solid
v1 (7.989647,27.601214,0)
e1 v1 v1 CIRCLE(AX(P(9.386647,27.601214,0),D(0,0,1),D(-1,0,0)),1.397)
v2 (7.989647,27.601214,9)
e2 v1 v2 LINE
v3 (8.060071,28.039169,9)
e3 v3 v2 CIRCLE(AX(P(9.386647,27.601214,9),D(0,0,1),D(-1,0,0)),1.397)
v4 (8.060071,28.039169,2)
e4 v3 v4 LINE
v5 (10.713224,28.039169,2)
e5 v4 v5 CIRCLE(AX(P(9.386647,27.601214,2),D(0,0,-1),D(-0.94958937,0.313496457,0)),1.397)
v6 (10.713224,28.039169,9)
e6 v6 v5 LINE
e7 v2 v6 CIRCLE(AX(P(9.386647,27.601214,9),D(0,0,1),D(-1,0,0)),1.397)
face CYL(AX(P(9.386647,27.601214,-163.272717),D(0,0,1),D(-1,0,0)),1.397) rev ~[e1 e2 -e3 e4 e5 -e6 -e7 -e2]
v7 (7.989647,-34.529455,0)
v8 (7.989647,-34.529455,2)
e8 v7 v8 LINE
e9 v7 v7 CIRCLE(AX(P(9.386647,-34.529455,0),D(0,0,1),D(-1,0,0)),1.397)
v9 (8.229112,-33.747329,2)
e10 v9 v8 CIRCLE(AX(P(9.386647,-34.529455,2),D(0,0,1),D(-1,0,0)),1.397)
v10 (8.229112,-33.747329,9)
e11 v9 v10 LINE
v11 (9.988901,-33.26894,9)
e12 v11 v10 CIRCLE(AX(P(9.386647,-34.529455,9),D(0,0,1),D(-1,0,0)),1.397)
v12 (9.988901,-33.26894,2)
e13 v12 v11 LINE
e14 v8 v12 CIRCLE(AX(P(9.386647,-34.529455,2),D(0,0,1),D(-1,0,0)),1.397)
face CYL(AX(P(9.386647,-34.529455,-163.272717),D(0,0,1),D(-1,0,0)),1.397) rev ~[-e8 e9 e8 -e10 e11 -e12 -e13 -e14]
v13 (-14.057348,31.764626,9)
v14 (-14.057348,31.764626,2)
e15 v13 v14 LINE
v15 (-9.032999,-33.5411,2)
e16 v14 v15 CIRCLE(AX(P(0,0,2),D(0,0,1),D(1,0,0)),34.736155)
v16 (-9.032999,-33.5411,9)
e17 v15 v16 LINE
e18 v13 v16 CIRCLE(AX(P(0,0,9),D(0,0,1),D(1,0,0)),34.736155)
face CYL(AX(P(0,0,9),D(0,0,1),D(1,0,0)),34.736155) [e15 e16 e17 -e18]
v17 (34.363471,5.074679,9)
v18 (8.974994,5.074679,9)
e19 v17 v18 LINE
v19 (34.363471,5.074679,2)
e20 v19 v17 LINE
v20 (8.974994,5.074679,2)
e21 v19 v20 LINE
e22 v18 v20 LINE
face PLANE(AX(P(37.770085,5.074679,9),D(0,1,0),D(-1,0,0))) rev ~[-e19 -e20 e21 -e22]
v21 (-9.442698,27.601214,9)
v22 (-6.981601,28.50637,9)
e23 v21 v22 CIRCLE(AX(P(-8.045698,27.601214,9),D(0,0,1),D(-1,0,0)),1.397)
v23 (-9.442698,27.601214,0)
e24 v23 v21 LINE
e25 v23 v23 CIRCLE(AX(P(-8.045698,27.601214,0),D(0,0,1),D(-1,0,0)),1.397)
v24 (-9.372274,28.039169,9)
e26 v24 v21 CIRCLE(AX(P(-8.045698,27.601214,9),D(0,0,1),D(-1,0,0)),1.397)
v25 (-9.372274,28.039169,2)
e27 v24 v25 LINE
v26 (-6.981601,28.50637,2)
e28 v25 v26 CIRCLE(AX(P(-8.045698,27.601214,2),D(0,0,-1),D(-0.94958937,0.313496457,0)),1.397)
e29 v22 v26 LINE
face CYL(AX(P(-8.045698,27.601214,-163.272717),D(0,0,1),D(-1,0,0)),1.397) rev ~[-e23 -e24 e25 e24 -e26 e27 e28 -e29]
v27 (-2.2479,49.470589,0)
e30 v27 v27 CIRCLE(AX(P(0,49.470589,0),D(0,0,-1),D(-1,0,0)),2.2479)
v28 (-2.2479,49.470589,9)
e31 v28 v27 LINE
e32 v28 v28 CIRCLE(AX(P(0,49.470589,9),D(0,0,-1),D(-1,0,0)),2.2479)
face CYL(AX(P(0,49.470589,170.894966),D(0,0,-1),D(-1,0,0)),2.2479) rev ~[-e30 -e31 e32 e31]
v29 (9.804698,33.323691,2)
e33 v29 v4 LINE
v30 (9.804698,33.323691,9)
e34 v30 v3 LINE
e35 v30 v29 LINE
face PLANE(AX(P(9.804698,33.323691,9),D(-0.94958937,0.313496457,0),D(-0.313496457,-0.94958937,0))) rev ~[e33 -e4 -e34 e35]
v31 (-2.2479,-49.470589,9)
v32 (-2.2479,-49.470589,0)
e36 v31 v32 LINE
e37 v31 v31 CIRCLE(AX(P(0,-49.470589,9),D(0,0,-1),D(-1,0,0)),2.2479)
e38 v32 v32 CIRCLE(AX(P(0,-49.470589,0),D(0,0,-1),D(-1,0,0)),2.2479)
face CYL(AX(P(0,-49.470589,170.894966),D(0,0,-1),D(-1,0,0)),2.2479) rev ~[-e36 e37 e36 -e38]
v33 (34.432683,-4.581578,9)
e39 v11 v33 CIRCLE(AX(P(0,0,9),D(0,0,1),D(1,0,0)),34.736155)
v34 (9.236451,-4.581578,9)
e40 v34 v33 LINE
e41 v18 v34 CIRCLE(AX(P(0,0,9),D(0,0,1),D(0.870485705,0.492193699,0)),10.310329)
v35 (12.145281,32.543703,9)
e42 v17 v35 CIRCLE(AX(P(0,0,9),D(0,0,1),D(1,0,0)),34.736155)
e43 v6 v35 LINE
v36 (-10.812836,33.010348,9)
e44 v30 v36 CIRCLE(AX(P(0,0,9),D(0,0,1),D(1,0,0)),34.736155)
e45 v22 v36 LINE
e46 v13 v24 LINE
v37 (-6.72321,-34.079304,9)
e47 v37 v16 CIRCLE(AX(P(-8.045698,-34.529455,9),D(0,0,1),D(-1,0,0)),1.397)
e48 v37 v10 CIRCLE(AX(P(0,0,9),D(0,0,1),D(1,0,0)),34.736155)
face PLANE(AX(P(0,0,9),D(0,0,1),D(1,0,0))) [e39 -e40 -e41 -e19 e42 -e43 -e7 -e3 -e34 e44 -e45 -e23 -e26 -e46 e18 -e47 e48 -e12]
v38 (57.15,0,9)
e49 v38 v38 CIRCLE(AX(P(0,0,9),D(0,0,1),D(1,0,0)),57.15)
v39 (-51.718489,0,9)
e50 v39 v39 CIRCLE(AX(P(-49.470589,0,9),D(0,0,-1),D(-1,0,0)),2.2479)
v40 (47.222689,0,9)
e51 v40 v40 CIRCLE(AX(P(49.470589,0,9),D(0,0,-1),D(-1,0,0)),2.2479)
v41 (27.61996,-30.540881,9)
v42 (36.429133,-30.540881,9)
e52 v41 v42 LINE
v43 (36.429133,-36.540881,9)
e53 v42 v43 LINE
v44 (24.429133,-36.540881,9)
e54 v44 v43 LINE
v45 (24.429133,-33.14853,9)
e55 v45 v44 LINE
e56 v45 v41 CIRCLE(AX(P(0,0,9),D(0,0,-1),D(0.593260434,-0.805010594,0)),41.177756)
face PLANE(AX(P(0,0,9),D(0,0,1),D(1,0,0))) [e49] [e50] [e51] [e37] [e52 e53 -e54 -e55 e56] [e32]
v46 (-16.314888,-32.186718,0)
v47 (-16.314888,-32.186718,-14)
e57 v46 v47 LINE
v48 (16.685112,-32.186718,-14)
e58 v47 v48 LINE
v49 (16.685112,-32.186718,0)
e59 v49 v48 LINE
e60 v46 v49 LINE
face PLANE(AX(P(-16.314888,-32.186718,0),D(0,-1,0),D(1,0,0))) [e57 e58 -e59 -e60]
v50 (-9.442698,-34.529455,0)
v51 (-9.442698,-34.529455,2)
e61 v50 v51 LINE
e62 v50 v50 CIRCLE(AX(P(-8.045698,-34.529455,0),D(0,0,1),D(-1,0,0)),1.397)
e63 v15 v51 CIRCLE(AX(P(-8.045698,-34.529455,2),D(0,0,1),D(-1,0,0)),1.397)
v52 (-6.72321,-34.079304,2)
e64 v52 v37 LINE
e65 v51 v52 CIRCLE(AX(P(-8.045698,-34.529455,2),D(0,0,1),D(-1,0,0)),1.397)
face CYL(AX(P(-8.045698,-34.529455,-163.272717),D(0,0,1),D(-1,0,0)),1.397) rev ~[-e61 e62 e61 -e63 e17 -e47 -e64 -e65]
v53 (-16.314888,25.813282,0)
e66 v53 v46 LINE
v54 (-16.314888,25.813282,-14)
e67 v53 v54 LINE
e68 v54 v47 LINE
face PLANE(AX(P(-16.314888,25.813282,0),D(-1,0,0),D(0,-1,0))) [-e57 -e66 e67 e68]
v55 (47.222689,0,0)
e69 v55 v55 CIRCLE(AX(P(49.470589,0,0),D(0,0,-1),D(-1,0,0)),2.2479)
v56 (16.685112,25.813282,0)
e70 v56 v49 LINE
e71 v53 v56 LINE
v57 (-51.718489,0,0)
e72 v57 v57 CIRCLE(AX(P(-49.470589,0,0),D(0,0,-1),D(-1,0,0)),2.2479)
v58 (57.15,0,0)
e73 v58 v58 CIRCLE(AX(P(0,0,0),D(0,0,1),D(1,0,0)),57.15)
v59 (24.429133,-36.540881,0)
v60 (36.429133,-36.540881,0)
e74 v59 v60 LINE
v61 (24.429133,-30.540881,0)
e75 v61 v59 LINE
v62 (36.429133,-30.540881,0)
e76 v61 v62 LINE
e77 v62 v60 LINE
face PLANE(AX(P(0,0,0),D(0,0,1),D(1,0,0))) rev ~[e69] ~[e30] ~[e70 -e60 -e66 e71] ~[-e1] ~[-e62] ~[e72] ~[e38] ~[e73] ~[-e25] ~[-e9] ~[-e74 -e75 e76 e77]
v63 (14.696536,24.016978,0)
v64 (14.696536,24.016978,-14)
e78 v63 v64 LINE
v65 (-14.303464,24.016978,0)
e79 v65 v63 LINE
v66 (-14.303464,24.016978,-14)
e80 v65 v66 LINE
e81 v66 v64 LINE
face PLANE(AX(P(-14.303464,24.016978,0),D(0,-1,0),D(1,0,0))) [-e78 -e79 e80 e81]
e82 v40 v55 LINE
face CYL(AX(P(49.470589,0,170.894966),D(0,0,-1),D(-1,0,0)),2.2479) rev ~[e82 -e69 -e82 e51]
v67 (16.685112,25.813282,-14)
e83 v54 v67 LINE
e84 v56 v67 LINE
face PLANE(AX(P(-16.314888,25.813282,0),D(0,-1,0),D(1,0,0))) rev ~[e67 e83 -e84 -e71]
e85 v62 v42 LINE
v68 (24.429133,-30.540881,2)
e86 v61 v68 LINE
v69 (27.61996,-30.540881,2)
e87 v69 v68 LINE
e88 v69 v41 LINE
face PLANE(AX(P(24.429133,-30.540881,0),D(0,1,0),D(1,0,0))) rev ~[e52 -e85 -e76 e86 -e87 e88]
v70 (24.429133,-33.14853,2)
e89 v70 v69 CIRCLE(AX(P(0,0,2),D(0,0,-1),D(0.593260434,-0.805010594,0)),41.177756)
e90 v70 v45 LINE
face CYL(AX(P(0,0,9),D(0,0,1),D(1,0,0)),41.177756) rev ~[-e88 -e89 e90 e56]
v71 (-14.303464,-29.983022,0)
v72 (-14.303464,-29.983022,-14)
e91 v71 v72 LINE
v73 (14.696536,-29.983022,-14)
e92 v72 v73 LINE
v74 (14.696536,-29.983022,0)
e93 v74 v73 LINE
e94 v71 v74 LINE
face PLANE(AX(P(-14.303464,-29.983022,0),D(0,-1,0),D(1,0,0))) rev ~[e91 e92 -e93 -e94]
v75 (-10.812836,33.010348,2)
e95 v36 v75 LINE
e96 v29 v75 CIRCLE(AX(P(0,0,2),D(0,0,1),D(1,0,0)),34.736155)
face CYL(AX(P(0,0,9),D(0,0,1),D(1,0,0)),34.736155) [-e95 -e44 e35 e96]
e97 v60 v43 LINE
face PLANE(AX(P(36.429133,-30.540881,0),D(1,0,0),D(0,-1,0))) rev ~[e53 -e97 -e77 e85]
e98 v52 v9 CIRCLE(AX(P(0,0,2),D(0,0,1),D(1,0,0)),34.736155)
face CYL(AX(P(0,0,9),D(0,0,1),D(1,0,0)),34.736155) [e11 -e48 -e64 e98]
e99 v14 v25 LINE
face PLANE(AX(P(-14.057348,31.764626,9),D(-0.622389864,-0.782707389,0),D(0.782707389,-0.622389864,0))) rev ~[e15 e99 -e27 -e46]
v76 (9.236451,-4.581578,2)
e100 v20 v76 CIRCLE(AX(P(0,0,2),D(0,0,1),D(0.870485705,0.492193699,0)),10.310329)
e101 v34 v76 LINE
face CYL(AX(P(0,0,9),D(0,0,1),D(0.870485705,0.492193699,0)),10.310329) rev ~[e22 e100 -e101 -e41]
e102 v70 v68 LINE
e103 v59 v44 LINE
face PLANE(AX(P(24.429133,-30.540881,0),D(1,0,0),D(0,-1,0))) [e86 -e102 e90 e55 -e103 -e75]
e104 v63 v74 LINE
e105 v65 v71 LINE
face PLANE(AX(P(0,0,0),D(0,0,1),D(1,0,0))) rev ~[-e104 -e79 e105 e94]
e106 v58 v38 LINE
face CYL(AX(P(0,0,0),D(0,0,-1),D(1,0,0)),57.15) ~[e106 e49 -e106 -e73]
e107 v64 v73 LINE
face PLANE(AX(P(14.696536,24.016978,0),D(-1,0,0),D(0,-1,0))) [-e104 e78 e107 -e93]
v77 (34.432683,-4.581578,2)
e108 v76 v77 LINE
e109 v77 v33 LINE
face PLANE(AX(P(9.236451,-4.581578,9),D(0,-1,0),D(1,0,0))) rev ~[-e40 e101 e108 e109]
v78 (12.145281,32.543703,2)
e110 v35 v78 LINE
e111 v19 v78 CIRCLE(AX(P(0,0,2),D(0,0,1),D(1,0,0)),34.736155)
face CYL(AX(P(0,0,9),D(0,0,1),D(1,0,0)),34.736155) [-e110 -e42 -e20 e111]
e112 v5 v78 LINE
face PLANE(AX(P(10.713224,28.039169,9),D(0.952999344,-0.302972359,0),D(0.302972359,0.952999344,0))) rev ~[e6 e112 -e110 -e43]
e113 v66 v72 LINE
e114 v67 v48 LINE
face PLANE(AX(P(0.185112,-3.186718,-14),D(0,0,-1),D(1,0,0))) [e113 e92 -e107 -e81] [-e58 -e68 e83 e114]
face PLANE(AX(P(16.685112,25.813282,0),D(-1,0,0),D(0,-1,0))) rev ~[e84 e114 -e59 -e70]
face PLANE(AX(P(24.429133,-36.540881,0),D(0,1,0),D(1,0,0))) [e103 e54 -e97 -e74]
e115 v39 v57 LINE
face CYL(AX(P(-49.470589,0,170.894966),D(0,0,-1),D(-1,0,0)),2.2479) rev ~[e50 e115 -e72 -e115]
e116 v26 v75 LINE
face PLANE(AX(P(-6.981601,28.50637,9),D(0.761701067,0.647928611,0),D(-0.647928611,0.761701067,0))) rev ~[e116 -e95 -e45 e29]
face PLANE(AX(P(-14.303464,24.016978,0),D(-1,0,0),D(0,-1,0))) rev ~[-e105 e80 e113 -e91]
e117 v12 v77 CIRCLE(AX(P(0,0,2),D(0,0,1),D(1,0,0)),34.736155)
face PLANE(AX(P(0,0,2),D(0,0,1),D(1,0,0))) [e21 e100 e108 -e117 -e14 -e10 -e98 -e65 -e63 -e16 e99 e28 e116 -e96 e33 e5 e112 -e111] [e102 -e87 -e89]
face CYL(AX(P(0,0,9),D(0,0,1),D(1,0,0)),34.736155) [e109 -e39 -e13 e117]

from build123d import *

# Parameters (mm, degrees)
F0_R      = 57.15
F1_DEPTH  = 9
F2_R      = 41.1777557501
F2_R_2    = 34.7361553424
F3_DEPTH  = 7
F5_DEPTH  = 7
F6_W      = 12
F6_H      = 6
F7_DEPTH  = 9
F9_D      = 4.4958
F10_W     = 33
F10_H     = 58
F10_W_2   = 29
F10_H_2   = 54
F11_DEPTH = 14
F13_D     = 2.794
F15_DEPTH = 7


with BuildPart() as f1:
    # F0 (on Top) → F1 (new body)
    with BuildSketch(Plane.XY):
        Circle(F0_R)
    extrude(amount=F1_DEPTH)

    # F2 (on face) → F3 (cut)
    with BuildSketch(Plane.XY.offset(9)):
        Circle(F2_R)
        Circle(F2_R_2, mode=Mode.SUBTRACT)
    extrude(amount=-F3_DEPTH, mode=Mode.SUBTRACT)

    # F4 (on face) → F5 (cut)
    with BuildSketch(Plane.XY.offset(9)):
        with BuildLine():
            ThreePointArc((9.2364512329, -4.5815780759), (10.0382703258, -2.3528743932), (10.3103292403, 0))
            ThreePointArc((10.3103292403, 0), (9.9709085428, 2.6237133751), (8.9749942157, 5.0746790905))
            Line((8.9749942157, 5.0746790905), (8.9749942157, -4.5815780759))
            Line((8.9749942157, -4.5815780759), (9.2364512329, -4.5815780759))
        make_face()
        with BuildLine():
            Line((37.7700850368, 5.0746790905), (34.3634707226, 5.0746790905))
            ThreePointArc((34.3634707226, 5.0746790905), (34.6428588969, 2.544172837), (34.7361553424, 0))
            ThreePointArc((34.7361553424, 0), (34.6602041198, -2.2958088649), (34.4326825895, -4.5815780759))
            Line((34.4326825895, -4.5815780759), (37.7700850368, -4.5815780759))
            Line((37.7700850368, -4.5815780759), (37.7700850368, 5.0746790905))
        make_face()
        with BuildLine():
            Line((8.9749942157, -4.5815780759), (8.9749942157, 5.0746790905))
            ThreePointArc((8.9749942157, 5.0746790905), (-10.3065518942, -0.27906468), (9.2364512329, -4.5815780759))
            Line((9.2364512329, -4.5815780759), (8.9749942157, -4.5815780759))
        make_face()
        with BuildLine():
            ThreePointArc((8.9749942157, 5.0746790905), (9.9709085428, 2.6237133751), (10.3103292403, 0))
            ThreePointArc((10.3103292403, 0), (10.0382703258, -2.3528743932), (9.2364512329, -4.5815780759))
            Line((9.2364512329, -4.5815780759), (34.4326825895, -4.5815780759))
            ThreePointArc((34.4326825895, -4.5815780759), (34.6602041198, -2.2958088649), (34.7361553424, 0))
            ThreePointArc((34.7361553424, 0), (34.6428588969, 2.544172837), (34.3634707226, 5.0746790905))
            Line((34.3634707226, 5.0746790905), (8.9749942157, 5.0746790905))
        make_face()
    extrude(amount=-F5_DEPTH, mode=Mode.SUBTRACT)

    # F6 (on face) → F7 (cut)
    with BuildSketch(Plane(origin=(0, 0, 0), x_dir=(1, 0, 0), z_dir=(0, 0, -1))):
        with Locations((30.4291332662, 33.5408807993)):
            Rectangle(F6_W, F6_H)
    extrude(amount=-F7_DEPTH, mode=Mode.SUBTRACT)

    # F9 (through all)
    with Locations(Plane.XY.offset(9)):
        with Locations((0, 49.4705886591), (-49.4705886591, 0), (0, -49.4705886591), (49.4705886591, 0)):
            Hole(F9_D / 2)

    # F10 (on face) → F11 (join)
    with BuildSketch(Plane(origin=(0, 0, 0), x_dir=(1, 0, 0), z_dir=(0, 0, -1))):
        with Locations((0.185111627, 3.1867184639)):
            Rectangle(F10_W, F10_H)
        with Locations((0.1965364888, 2.9830217808)):
            Rectangle(F10_W_2, F10_H_2, mode=Mode.SUBTRACT)
    extrude(amount=F11_DEPTH)

    # F13 (through all)
    with Locations(Plane(origin=(0, 0, 0), x_dir=(1, 0, 0), z_dir=(0, 0, -1))):
        with Locations((-8.0456975847, 34.5294550061), (9.3866474926, 34.5294550061), (-8.0456975847, -27.6012141258), (9.3866474926, -27.6012141258)):
            Hole(F13_D / 2)

    # F14 (on face) → F15 (cut)
    with BuildSketch(Plane.XY.offset(9)):
        with BuildLine():
            Line((-14.0573482538, 31.7646257344), (-9.3722739345, 28.0391686762))
            ThreePointArc((-9.3722739345, 28.0391686762), (-8.3136402911, 28.9722778391), (-6.9816011946, 28.5063703953))
            Line((-6.9816011946, 28.5063703953), (-10.8128362283, 33.0103477817))
            ThreePointArc((-10.8128362283, 33.0103477817), (-12.4506817042, 32.4280898771), (-14.0573482538, 31.7646257344))
        make_face()
        with BuildLine():
            ThreePointArc((12.1452810093, 32.5437034951), (10.9819164525, 32.9544837466), (9.804697926, 33.3236910704))
            Line((9.804697926, 33.3236910704), (8.0600711429, 28.0391686762))
            ThreePointArc((8.0600711429, 28.0391686762), (9.3866474926, 28.9982141258), (10.7132238424, 28.0391686762))
            Line((10.7132238424, 28.0391686762), (12.1452810093, 32.5437034951))
        make_face()
    extrude(amount=-F15_DEPTH, mode=Mode.SUBTRACT)


solid = f1.part
